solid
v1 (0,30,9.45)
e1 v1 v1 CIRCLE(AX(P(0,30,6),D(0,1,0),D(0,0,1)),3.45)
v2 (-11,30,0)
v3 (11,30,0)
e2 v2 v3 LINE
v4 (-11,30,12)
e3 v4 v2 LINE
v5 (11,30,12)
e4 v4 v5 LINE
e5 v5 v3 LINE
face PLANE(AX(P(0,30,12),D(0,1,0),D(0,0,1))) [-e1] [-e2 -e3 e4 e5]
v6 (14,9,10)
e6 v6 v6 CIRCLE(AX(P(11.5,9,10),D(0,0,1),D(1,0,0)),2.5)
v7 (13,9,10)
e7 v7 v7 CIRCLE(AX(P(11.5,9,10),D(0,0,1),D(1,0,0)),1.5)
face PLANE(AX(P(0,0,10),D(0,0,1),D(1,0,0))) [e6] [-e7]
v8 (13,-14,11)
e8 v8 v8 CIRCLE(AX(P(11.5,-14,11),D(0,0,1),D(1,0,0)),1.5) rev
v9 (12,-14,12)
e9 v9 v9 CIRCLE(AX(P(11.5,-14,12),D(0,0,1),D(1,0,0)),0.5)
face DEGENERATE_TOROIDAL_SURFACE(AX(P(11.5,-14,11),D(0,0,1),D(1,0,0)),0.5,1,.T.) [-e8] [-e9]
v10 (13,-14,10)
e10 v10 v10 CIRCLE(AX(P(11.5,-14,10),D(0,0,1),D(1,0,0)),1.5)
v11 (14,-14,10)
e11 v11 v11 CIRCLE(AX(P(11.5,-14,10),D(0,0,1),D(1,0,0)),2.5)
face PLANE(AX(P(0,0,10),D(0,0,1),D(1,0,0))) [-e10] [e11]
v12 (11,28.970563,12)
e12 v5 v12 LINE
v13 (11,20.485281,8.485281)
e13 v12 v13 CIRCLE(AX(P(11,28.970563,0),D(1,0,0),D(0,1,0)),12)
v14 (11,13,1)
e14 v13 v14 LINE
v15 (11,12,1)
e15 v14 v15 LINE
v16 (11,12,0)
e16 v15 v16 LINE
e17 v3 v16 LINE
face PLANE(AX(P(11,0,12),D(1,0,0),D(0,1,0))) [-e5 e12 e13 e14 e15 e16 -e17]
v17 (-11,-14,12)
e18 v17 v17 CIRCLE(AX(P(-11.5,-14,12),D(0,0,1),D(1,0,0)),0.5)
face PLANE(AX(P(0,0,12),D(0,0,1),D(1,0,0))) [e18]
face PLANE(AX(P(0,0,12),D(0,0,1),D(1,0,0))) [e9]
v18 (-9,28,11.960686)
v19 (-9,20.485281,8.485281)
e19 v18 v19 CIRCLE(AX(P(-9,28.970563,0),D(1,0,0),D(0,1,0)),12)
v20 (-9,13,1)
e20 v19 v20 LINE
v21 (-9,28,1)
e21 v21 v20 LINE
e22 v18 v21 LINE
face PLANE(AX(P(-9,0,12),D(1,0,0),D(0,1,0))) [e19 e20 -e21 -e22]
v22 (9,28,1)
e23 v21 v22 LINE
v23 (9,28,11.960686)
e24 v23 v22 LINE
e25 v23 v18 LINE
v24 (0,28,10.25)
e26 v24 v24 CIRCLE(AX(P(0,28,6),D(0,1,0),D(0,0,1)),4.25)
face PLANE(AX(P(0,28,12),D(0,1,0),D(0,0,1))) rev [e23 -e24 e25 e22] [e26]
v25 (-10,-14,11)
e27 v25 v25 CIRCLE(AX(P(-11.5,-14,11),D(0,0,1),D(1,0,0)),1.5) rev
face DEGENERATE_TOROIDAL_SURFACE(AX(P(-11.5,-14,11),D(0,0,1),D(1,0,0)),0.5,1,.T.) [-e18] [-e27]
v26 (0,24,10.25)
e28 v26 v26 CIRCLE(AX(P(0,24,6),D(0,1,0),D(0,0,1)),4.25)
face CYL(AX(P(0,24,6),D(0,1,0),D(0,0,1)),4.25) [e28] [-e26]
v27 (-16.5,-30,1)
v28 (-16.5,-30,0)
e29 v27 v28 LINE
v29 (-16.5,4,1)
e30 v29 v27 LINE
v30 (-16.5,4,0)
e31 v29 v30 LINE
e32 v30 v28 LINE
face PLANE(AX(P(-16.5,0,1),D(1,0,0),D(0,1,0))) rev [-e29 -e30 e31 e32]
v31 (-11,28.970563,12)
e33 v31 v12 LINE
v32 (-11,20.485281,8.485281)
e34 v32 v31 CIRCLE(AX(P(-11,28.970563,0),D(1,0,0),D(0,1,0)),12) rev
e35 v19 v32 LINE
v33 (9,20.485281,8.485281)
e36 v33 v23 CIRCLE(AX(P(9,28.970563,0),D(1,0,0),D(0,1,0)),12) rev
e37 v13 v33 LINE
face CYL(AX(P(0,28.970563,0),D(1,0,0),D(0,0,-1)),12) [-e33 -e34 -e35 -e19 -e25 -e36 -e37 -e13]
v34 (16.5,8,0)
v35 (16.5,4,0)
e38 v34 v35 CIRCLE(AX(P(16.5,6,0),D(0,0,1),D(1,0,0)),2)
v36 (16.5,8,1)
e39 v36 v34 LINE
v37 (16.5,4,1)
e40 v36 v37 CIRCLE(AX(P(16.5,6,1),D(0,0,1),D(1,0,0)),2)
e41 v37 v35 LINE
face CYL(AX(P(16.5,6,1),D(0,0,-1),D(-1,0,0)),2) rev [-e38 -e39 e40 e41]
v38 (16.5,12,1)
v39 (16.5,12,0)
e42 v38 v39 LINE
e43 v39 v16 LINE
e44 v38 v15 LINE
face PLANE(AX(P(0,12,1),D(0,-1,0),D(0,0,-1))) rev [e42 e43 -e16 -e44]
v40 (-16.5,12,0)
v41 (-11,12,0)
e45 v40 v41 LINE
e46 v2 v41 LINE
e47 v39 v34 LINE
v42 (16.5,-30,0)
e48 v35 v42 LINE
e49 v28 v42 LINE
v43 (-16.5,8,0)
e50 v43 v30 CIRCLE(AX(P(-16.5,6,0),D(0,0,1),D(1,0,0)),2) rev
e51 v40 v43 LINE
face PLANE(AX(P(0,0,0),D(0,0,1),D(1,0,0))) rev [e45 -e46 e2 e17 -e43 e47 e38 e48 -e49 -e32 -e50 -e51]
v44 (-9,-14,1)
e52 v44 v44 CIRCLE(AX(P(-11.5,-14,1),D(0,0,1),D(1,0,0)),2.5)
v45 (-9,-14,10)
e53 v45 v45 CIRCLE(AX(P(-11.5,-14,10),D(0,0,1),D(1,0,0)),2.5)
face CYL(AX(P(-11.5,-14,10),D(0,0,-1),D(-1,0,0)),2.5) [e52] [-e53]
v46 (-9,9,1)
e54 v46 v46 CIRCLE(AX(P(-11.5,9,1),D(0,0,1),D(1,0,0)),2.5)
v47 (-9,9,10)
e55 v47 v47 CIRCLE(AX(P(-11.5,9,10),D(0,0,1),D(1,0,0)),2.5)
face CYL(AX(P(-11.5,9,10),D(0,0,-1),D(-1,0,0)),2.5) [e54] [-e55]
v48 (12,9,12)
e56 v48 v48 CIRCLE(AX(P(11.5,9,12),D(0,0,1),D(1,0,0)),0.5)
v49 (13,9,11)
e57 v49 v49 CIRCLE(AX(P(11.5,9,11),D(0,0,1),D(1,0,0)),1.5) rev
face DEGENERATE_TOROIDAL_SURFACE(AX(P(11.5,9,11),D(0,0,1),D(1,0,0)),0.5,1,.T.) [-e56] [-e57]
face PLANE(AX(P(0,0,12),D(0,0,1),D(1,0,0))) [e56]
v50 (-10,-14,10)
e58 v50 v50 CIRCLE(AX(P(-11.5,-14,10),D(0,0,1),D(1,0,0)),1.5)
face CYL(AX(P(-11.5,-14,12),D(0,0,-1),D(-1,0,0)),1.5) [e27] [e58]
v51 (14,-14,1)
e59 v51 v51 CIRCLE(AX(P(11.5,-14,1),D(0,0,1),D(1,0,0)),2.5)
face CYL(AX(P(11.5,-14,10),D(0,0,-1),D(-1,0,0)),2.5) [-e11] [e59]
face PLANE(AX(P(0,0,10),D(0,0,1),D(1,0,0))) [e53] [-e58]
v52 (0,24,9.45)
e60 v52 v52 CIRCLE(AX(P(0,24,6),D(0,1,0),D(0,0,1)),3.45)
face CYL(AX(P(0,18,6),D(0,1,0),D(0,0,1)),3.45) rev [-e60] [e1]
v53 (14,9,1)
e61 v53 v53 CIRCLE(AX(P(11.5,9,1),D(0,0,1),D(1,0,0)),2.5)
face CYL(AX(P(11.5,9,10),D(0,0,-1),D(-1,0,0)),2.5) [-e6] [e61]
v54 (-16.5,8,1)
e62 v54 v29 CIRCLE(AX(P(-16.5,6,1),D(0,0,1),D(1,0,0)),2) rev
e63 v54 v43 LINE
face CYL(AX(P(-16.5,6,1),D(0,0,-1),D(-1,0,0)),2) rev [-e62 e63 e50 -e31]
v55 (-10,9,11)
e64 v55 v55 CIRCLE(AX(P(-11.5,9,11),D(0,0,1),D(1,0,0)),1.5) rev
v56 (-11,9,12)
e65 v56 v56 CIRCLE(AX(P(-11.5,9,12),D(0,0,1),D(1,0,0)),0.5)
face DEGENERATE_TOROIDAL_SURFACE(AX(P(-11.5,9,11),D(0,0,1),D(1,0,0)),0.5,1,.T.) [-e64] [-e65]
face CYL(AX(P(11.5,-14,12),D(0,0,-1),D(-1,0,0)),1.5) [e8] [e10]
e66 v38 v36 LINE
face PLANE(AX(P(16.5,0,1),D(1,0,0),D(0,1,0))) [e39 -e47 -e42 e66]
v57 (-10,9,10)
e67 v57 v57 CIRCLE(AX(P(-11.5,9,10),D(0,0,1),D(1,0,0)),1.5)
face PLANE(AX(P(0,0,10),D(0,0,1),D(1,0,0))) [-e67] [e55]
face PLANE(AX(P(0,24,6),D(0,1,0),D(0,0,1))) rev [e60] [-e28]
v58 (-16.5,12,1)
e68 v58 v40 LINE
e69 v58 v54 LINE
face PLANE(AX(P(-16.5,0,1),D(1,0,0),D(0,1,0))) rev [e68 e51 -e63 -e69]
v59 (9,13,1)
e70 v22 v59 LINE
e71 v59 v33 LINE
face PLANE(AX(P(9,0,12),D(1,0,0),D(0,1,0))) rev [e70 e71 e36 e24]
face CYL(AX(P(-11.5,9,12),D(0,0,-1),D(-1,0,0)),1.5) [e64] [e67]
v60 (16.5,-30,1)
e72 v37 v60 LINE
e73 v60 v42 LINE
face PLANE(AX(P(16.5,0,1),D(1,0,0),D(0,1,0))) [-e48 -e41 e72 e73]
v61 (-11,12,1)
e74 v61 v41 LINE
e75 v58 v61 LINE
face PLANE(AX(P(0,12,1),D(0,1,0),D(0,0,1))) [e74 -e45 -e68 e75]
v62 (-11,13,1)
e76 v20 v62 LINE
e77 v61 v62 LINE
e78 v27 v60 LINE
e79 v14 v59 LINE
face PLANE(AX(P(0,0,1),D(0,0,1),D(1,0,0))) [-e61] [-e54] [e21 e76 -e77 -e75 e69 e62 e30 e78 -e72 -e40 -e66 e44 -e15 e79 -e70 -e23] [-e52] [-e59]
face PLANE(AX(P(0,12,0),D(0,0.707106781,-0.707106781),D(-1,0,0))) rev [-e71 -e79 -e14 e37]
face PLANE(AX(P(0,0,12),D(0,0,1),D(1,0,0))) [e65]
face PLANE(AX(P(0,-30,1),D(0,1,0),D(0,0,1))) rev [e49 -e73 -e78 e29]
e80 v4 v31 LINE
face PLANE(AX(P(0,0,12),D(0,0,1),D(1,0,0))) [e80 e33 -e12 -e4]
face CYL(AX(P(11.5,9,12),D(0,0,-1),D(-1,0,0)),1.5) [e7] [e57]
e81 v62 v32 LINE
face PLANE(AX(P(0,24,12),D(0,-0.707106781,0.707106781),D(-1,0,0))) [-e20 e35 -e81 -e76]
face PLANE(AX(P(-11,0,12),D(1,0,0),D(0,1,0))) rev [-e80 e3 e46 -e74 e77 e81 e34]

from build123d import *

# Parameters (mm, degrees)
SKIZZE1_R                        = 2.5
AUFSATZ_LINEAR_AUSTRAGEN4_DEPTH  = 1
SKIZZE1_3_R                      = 2.5
SKIZZE1_3_R_2                    = 1.5
AUFSATZ_LINEAR_AUSTRAGEN5_DEPTH  = 10
SKIZZE1_4_R                      = 1.5
AUFSATZ_LINEAR_AUSTRAGEN6_DEPTH  = 12
VERRUNDUNG4_R                    = 1
SKIZZE1_5_W                      = 2
SKIZZE1_5_H                      = 16
AUFSATZ_LINEAR_AUSTRAGEN7_DEPTH  = 12
FASE3_SIZE                       = 12
VERRUNDUNG5_R                    = 12
SCHNITT_LINEAR_AUSTRAGEN2_DEPTH  = 12
SKIZZE5_4_R                      = 4.25
SKIZZE5_4_R_2                    = 3.45
AUFSATZ_LINEAR_AUSTRAGEN10_DEPTH = 6


with BuildPart() as part:
    # Skizze1 → Aufsatz-Linear austragen4 (new body)
    with BuildSketch(Plane.XY):
        with BuildLine():
            Line((-11, 12), (-16.5, 12))
            Line((-16.5, 12), (-16.5, 8))
            ThreePointArc((-16.5, 8), (-14.5, 6), (-16.5, 4))
            Line((-16.5, 4), (-16.5, -30))
            Line((-16.5, -30), (16.5, -30))
            Line((16.5, -30), (16.5, 4))
            ThreePointArc((16.5, 4), (14.5, 6), (16.5, 8))
            Line((16.5, 8), (16.5, 12))
            Line((16.5, 12), (11, 12))
            Line((11, 12), (9, 12))
            Line((9, 12), (9, 28))
            Line((9, 28), (-9, 28))
            Line((-9, 28), (-9, 12))
            Line((-9, 12), (-11, 12))
        make_face()
        with Locations((-11.5, -14)):
            Circle(SKIZZE1_R, mode=Mode.SUBTRACT)
        with Locations((11.5, -14)):
            Circle(SKIZZE1_R, mode=Mode.SUBTRACT)
        with Locations((-11.5, 9)):
            Circle(SKIZZE1_R, mode=Mode.SUBTRACT)
        with Locations((11.5, 9)):
            Circle(SKIZZE1_R, mode=Mode.SUBTRACT)
    extrude(amount=AUFSATZ_LINEAR_AUSTRAGEN4_DEPTH)

    # Skizze1<3> → Aufsatz-Linear austragen5 (add)
    # profile 1 of 4: a face of its own
    with BuildSketch(Plane.XY):
        with Locations((11.5, 9)):
            Circle(SKIZZE1_3_R)
        with Locations((11.5, 9)):
            Circle(SKIZZE1_3_R_2, mode=Mode.SUBTRACT)
    # profile 2 of 4: a face of its own
    with BuildSketch(Plane.XY):
        with Locations((-11.5, 9)):
            Circle(SKIZZE1_3_R)
        with Locations((-11.5, 9)):
            Circle(SKIZZE1_3_R_2, mode=Mode.SUBTRACT)
    # profile 3 of 4: a face of its own
    with BuildSketch(Plane.XY):
        with Locations((-11.5, -14)):
            Circle(SKIZZE1_3_R)
        with Locations((-11.5, -14)):
            Circle(SKIZZE1_3_R_2, mode=Mode.SUBTRACT)
    # profile 4 of 4: a face of its own
    with BuildSketch(Plane.XY):
        with Locations((11.5, -14)):
            Circle(SKIZZE1_3_R)
        with Locations((11.5, -14)):
            Circle(SKIZZE1_3_R_2, mode=Mode.SUBTRACT)
    extrude(amount=AUFSATZ_LINEAR_AUSTRAGEN5_DEPTH)

    # Skizze1<4> → Aufsatz-Linear austragen6 (add)
    with BuildSketch(Plane.XY):
        with Locations((-11.5, 9)):
            Circle(SKIZZE1_4_R)
        with Locations((11.5, 9)):
            Circle(SKIZZE1_4_R)
        with Locations((-11.5, -14)):
            Circle(SKIZZE1_4_R)
        with Locations((11.5, -14)):
            Circle(SKIZZE1_4_R)
    extrude(amount=AUFSATZ_LINEAR_AUSTRAGEN6_DEPTH)

    # Verrundung4
    verrundung4_edges = [part.edges().sort_by_distance(p)[0] for p in [
        (-13, 9, 12),
        (10, 9, 12),
        (-13, -14, 12),
        (10, -14, 12),
    ]]
    fillet(verrundung4_edges, radius=VERRUNDUNG4_R)

    # Skizze1<5> → Aufsatz-Linear austragen7 (add)
    with BuildSketch(Plane.XY):
        with Locations((-10, 20)):
            Rectangle(SKIZZE1_5_W, SKIZZE1_5_H)
        Polygon((11, 30), (-11, 30), (-11, 28), (-9, 28), (9, 28), (11, 28), align=None)
        with Locations((10, 20)):
            Rectangle(SKIZZE1_5_W, SKIZZE1_5_H)
    extrude(amount=AUFSATZ_LINEAR_AUSTRAGEN7_DEPTH)

    # Fase3
    # the kernel refuses this chamfer: 12 mm, written as the material it takes off along each edge
    with BuildSketch(Plane(origin=(-41.860195856, 12, 12), x_dir=(0, -0.027495876610586348, -0.9996219169112968), z_dir=(1, 0, 0))) as fase3_piece_1_section:
        Polygon((FASE3_SIZE * 0.999621916911, FASE3_SIZE * 0.0274958766106), (-FASE3_SIZE * 0.0274958766106, FASE3_SIZE * 0.999621916911), (0, 0), align=None)
    fase3_piece_1 = extrude(amount=63.720391711, mode=Mode.PRIVATE)
    fase3_piece_1 = split(fase3_piece_1, bisect_by=Plane(origin=(-10, 16.015873454, 1), z_dir=(0, 0, 1)), keep=Keep.TOP, mode=Mode.PRIVATE)
    add(fase3_piece_1, mode=Mode.SUBTRACT)
    with BuildSketch(Plane(origin=(-21.860195856, 12, 12), x_dir=(0, -0.027495876610586348, -0.9996219169112968), z_dir=(1, 0, 0))) as fase3_piece_2_section:
        Polygon((FASE3_SIZE * 0.999621916911, FASE3_SIZE * 0.0274958766106), (-FASE3_SIZE * 0.0274958766106, FASE3_SIZE * 0.999621916911), (0, 0), align=None)
    fase3_piece_2 = extrude(amount=63.720391711, mode=Mode.PRIVATE)
    fase3_piece_2 = split(fase3_piece_2, bisect_by=Plane(origin=(10, 16.015873454, 1), z_dir=(0, 0, 1)), keep=Keep.TOP, mode=Mode.PRIVATE)
    add(fase3_piece_2, mode=Mode.SUBTRACT)

    # Verrundung5
    verrundung5_edges = [part.edges().sort_by_distance(p)[0] for p in [
        (-10, 24, 12),
    ]]
    fillet(verrundung5_edges, radius=VERRUNDUNG5_R)

    # Skizze5 → Schnitt-Linear austragen2 (cut)
    with BuildSketch(Plane(origin=(0, 30, 0), x_dir=(1, 0, 0), z_dir=(0, 1, 0))):
        with BuildLine():
            ThreePointArc((3.45, -6), (2.439518395, -3.560481605), (0, -2.55))
            Line((0, -2.55), (0, -9.45))
            ThreePointArc((0, -9.45), (2.439518395, -8.439518395), (3.45, -6))
        make_face()
        with BuildLine():
            Line((0, -9.45), (0, -2.55))
            ThreePointArc((0, -2.55), (-3.45, -6), (0, -9.45))
        make_face()
    extrude(amount=-SCHNITT_LINEAR_AUSTRAGEN2_DEPTH, mode=Mode.SUBTRACT)

    # Skizze5<4> → Aufsatz-Linear austragen10 (add)
    with BuildSketch(Plane(origin=(0, 30, 0), x_dir=(1, 0, 0), z_dir=(0, 1, 0))):
        with Locations(Location((0, -6, 0), (0, 0, 270))):
            Circle(SKIZZE5_4_R)
        with Locations(Location((0, -6, 0), (0, 0, 270))):
            Circle(SKIZZE5_4_R_2, mode=Mode.SUBTRACT)
    extrude(amount=-AUFSATZ_LINEAR_AUSTRAGEN10_DEPTH)


solid = part.part
